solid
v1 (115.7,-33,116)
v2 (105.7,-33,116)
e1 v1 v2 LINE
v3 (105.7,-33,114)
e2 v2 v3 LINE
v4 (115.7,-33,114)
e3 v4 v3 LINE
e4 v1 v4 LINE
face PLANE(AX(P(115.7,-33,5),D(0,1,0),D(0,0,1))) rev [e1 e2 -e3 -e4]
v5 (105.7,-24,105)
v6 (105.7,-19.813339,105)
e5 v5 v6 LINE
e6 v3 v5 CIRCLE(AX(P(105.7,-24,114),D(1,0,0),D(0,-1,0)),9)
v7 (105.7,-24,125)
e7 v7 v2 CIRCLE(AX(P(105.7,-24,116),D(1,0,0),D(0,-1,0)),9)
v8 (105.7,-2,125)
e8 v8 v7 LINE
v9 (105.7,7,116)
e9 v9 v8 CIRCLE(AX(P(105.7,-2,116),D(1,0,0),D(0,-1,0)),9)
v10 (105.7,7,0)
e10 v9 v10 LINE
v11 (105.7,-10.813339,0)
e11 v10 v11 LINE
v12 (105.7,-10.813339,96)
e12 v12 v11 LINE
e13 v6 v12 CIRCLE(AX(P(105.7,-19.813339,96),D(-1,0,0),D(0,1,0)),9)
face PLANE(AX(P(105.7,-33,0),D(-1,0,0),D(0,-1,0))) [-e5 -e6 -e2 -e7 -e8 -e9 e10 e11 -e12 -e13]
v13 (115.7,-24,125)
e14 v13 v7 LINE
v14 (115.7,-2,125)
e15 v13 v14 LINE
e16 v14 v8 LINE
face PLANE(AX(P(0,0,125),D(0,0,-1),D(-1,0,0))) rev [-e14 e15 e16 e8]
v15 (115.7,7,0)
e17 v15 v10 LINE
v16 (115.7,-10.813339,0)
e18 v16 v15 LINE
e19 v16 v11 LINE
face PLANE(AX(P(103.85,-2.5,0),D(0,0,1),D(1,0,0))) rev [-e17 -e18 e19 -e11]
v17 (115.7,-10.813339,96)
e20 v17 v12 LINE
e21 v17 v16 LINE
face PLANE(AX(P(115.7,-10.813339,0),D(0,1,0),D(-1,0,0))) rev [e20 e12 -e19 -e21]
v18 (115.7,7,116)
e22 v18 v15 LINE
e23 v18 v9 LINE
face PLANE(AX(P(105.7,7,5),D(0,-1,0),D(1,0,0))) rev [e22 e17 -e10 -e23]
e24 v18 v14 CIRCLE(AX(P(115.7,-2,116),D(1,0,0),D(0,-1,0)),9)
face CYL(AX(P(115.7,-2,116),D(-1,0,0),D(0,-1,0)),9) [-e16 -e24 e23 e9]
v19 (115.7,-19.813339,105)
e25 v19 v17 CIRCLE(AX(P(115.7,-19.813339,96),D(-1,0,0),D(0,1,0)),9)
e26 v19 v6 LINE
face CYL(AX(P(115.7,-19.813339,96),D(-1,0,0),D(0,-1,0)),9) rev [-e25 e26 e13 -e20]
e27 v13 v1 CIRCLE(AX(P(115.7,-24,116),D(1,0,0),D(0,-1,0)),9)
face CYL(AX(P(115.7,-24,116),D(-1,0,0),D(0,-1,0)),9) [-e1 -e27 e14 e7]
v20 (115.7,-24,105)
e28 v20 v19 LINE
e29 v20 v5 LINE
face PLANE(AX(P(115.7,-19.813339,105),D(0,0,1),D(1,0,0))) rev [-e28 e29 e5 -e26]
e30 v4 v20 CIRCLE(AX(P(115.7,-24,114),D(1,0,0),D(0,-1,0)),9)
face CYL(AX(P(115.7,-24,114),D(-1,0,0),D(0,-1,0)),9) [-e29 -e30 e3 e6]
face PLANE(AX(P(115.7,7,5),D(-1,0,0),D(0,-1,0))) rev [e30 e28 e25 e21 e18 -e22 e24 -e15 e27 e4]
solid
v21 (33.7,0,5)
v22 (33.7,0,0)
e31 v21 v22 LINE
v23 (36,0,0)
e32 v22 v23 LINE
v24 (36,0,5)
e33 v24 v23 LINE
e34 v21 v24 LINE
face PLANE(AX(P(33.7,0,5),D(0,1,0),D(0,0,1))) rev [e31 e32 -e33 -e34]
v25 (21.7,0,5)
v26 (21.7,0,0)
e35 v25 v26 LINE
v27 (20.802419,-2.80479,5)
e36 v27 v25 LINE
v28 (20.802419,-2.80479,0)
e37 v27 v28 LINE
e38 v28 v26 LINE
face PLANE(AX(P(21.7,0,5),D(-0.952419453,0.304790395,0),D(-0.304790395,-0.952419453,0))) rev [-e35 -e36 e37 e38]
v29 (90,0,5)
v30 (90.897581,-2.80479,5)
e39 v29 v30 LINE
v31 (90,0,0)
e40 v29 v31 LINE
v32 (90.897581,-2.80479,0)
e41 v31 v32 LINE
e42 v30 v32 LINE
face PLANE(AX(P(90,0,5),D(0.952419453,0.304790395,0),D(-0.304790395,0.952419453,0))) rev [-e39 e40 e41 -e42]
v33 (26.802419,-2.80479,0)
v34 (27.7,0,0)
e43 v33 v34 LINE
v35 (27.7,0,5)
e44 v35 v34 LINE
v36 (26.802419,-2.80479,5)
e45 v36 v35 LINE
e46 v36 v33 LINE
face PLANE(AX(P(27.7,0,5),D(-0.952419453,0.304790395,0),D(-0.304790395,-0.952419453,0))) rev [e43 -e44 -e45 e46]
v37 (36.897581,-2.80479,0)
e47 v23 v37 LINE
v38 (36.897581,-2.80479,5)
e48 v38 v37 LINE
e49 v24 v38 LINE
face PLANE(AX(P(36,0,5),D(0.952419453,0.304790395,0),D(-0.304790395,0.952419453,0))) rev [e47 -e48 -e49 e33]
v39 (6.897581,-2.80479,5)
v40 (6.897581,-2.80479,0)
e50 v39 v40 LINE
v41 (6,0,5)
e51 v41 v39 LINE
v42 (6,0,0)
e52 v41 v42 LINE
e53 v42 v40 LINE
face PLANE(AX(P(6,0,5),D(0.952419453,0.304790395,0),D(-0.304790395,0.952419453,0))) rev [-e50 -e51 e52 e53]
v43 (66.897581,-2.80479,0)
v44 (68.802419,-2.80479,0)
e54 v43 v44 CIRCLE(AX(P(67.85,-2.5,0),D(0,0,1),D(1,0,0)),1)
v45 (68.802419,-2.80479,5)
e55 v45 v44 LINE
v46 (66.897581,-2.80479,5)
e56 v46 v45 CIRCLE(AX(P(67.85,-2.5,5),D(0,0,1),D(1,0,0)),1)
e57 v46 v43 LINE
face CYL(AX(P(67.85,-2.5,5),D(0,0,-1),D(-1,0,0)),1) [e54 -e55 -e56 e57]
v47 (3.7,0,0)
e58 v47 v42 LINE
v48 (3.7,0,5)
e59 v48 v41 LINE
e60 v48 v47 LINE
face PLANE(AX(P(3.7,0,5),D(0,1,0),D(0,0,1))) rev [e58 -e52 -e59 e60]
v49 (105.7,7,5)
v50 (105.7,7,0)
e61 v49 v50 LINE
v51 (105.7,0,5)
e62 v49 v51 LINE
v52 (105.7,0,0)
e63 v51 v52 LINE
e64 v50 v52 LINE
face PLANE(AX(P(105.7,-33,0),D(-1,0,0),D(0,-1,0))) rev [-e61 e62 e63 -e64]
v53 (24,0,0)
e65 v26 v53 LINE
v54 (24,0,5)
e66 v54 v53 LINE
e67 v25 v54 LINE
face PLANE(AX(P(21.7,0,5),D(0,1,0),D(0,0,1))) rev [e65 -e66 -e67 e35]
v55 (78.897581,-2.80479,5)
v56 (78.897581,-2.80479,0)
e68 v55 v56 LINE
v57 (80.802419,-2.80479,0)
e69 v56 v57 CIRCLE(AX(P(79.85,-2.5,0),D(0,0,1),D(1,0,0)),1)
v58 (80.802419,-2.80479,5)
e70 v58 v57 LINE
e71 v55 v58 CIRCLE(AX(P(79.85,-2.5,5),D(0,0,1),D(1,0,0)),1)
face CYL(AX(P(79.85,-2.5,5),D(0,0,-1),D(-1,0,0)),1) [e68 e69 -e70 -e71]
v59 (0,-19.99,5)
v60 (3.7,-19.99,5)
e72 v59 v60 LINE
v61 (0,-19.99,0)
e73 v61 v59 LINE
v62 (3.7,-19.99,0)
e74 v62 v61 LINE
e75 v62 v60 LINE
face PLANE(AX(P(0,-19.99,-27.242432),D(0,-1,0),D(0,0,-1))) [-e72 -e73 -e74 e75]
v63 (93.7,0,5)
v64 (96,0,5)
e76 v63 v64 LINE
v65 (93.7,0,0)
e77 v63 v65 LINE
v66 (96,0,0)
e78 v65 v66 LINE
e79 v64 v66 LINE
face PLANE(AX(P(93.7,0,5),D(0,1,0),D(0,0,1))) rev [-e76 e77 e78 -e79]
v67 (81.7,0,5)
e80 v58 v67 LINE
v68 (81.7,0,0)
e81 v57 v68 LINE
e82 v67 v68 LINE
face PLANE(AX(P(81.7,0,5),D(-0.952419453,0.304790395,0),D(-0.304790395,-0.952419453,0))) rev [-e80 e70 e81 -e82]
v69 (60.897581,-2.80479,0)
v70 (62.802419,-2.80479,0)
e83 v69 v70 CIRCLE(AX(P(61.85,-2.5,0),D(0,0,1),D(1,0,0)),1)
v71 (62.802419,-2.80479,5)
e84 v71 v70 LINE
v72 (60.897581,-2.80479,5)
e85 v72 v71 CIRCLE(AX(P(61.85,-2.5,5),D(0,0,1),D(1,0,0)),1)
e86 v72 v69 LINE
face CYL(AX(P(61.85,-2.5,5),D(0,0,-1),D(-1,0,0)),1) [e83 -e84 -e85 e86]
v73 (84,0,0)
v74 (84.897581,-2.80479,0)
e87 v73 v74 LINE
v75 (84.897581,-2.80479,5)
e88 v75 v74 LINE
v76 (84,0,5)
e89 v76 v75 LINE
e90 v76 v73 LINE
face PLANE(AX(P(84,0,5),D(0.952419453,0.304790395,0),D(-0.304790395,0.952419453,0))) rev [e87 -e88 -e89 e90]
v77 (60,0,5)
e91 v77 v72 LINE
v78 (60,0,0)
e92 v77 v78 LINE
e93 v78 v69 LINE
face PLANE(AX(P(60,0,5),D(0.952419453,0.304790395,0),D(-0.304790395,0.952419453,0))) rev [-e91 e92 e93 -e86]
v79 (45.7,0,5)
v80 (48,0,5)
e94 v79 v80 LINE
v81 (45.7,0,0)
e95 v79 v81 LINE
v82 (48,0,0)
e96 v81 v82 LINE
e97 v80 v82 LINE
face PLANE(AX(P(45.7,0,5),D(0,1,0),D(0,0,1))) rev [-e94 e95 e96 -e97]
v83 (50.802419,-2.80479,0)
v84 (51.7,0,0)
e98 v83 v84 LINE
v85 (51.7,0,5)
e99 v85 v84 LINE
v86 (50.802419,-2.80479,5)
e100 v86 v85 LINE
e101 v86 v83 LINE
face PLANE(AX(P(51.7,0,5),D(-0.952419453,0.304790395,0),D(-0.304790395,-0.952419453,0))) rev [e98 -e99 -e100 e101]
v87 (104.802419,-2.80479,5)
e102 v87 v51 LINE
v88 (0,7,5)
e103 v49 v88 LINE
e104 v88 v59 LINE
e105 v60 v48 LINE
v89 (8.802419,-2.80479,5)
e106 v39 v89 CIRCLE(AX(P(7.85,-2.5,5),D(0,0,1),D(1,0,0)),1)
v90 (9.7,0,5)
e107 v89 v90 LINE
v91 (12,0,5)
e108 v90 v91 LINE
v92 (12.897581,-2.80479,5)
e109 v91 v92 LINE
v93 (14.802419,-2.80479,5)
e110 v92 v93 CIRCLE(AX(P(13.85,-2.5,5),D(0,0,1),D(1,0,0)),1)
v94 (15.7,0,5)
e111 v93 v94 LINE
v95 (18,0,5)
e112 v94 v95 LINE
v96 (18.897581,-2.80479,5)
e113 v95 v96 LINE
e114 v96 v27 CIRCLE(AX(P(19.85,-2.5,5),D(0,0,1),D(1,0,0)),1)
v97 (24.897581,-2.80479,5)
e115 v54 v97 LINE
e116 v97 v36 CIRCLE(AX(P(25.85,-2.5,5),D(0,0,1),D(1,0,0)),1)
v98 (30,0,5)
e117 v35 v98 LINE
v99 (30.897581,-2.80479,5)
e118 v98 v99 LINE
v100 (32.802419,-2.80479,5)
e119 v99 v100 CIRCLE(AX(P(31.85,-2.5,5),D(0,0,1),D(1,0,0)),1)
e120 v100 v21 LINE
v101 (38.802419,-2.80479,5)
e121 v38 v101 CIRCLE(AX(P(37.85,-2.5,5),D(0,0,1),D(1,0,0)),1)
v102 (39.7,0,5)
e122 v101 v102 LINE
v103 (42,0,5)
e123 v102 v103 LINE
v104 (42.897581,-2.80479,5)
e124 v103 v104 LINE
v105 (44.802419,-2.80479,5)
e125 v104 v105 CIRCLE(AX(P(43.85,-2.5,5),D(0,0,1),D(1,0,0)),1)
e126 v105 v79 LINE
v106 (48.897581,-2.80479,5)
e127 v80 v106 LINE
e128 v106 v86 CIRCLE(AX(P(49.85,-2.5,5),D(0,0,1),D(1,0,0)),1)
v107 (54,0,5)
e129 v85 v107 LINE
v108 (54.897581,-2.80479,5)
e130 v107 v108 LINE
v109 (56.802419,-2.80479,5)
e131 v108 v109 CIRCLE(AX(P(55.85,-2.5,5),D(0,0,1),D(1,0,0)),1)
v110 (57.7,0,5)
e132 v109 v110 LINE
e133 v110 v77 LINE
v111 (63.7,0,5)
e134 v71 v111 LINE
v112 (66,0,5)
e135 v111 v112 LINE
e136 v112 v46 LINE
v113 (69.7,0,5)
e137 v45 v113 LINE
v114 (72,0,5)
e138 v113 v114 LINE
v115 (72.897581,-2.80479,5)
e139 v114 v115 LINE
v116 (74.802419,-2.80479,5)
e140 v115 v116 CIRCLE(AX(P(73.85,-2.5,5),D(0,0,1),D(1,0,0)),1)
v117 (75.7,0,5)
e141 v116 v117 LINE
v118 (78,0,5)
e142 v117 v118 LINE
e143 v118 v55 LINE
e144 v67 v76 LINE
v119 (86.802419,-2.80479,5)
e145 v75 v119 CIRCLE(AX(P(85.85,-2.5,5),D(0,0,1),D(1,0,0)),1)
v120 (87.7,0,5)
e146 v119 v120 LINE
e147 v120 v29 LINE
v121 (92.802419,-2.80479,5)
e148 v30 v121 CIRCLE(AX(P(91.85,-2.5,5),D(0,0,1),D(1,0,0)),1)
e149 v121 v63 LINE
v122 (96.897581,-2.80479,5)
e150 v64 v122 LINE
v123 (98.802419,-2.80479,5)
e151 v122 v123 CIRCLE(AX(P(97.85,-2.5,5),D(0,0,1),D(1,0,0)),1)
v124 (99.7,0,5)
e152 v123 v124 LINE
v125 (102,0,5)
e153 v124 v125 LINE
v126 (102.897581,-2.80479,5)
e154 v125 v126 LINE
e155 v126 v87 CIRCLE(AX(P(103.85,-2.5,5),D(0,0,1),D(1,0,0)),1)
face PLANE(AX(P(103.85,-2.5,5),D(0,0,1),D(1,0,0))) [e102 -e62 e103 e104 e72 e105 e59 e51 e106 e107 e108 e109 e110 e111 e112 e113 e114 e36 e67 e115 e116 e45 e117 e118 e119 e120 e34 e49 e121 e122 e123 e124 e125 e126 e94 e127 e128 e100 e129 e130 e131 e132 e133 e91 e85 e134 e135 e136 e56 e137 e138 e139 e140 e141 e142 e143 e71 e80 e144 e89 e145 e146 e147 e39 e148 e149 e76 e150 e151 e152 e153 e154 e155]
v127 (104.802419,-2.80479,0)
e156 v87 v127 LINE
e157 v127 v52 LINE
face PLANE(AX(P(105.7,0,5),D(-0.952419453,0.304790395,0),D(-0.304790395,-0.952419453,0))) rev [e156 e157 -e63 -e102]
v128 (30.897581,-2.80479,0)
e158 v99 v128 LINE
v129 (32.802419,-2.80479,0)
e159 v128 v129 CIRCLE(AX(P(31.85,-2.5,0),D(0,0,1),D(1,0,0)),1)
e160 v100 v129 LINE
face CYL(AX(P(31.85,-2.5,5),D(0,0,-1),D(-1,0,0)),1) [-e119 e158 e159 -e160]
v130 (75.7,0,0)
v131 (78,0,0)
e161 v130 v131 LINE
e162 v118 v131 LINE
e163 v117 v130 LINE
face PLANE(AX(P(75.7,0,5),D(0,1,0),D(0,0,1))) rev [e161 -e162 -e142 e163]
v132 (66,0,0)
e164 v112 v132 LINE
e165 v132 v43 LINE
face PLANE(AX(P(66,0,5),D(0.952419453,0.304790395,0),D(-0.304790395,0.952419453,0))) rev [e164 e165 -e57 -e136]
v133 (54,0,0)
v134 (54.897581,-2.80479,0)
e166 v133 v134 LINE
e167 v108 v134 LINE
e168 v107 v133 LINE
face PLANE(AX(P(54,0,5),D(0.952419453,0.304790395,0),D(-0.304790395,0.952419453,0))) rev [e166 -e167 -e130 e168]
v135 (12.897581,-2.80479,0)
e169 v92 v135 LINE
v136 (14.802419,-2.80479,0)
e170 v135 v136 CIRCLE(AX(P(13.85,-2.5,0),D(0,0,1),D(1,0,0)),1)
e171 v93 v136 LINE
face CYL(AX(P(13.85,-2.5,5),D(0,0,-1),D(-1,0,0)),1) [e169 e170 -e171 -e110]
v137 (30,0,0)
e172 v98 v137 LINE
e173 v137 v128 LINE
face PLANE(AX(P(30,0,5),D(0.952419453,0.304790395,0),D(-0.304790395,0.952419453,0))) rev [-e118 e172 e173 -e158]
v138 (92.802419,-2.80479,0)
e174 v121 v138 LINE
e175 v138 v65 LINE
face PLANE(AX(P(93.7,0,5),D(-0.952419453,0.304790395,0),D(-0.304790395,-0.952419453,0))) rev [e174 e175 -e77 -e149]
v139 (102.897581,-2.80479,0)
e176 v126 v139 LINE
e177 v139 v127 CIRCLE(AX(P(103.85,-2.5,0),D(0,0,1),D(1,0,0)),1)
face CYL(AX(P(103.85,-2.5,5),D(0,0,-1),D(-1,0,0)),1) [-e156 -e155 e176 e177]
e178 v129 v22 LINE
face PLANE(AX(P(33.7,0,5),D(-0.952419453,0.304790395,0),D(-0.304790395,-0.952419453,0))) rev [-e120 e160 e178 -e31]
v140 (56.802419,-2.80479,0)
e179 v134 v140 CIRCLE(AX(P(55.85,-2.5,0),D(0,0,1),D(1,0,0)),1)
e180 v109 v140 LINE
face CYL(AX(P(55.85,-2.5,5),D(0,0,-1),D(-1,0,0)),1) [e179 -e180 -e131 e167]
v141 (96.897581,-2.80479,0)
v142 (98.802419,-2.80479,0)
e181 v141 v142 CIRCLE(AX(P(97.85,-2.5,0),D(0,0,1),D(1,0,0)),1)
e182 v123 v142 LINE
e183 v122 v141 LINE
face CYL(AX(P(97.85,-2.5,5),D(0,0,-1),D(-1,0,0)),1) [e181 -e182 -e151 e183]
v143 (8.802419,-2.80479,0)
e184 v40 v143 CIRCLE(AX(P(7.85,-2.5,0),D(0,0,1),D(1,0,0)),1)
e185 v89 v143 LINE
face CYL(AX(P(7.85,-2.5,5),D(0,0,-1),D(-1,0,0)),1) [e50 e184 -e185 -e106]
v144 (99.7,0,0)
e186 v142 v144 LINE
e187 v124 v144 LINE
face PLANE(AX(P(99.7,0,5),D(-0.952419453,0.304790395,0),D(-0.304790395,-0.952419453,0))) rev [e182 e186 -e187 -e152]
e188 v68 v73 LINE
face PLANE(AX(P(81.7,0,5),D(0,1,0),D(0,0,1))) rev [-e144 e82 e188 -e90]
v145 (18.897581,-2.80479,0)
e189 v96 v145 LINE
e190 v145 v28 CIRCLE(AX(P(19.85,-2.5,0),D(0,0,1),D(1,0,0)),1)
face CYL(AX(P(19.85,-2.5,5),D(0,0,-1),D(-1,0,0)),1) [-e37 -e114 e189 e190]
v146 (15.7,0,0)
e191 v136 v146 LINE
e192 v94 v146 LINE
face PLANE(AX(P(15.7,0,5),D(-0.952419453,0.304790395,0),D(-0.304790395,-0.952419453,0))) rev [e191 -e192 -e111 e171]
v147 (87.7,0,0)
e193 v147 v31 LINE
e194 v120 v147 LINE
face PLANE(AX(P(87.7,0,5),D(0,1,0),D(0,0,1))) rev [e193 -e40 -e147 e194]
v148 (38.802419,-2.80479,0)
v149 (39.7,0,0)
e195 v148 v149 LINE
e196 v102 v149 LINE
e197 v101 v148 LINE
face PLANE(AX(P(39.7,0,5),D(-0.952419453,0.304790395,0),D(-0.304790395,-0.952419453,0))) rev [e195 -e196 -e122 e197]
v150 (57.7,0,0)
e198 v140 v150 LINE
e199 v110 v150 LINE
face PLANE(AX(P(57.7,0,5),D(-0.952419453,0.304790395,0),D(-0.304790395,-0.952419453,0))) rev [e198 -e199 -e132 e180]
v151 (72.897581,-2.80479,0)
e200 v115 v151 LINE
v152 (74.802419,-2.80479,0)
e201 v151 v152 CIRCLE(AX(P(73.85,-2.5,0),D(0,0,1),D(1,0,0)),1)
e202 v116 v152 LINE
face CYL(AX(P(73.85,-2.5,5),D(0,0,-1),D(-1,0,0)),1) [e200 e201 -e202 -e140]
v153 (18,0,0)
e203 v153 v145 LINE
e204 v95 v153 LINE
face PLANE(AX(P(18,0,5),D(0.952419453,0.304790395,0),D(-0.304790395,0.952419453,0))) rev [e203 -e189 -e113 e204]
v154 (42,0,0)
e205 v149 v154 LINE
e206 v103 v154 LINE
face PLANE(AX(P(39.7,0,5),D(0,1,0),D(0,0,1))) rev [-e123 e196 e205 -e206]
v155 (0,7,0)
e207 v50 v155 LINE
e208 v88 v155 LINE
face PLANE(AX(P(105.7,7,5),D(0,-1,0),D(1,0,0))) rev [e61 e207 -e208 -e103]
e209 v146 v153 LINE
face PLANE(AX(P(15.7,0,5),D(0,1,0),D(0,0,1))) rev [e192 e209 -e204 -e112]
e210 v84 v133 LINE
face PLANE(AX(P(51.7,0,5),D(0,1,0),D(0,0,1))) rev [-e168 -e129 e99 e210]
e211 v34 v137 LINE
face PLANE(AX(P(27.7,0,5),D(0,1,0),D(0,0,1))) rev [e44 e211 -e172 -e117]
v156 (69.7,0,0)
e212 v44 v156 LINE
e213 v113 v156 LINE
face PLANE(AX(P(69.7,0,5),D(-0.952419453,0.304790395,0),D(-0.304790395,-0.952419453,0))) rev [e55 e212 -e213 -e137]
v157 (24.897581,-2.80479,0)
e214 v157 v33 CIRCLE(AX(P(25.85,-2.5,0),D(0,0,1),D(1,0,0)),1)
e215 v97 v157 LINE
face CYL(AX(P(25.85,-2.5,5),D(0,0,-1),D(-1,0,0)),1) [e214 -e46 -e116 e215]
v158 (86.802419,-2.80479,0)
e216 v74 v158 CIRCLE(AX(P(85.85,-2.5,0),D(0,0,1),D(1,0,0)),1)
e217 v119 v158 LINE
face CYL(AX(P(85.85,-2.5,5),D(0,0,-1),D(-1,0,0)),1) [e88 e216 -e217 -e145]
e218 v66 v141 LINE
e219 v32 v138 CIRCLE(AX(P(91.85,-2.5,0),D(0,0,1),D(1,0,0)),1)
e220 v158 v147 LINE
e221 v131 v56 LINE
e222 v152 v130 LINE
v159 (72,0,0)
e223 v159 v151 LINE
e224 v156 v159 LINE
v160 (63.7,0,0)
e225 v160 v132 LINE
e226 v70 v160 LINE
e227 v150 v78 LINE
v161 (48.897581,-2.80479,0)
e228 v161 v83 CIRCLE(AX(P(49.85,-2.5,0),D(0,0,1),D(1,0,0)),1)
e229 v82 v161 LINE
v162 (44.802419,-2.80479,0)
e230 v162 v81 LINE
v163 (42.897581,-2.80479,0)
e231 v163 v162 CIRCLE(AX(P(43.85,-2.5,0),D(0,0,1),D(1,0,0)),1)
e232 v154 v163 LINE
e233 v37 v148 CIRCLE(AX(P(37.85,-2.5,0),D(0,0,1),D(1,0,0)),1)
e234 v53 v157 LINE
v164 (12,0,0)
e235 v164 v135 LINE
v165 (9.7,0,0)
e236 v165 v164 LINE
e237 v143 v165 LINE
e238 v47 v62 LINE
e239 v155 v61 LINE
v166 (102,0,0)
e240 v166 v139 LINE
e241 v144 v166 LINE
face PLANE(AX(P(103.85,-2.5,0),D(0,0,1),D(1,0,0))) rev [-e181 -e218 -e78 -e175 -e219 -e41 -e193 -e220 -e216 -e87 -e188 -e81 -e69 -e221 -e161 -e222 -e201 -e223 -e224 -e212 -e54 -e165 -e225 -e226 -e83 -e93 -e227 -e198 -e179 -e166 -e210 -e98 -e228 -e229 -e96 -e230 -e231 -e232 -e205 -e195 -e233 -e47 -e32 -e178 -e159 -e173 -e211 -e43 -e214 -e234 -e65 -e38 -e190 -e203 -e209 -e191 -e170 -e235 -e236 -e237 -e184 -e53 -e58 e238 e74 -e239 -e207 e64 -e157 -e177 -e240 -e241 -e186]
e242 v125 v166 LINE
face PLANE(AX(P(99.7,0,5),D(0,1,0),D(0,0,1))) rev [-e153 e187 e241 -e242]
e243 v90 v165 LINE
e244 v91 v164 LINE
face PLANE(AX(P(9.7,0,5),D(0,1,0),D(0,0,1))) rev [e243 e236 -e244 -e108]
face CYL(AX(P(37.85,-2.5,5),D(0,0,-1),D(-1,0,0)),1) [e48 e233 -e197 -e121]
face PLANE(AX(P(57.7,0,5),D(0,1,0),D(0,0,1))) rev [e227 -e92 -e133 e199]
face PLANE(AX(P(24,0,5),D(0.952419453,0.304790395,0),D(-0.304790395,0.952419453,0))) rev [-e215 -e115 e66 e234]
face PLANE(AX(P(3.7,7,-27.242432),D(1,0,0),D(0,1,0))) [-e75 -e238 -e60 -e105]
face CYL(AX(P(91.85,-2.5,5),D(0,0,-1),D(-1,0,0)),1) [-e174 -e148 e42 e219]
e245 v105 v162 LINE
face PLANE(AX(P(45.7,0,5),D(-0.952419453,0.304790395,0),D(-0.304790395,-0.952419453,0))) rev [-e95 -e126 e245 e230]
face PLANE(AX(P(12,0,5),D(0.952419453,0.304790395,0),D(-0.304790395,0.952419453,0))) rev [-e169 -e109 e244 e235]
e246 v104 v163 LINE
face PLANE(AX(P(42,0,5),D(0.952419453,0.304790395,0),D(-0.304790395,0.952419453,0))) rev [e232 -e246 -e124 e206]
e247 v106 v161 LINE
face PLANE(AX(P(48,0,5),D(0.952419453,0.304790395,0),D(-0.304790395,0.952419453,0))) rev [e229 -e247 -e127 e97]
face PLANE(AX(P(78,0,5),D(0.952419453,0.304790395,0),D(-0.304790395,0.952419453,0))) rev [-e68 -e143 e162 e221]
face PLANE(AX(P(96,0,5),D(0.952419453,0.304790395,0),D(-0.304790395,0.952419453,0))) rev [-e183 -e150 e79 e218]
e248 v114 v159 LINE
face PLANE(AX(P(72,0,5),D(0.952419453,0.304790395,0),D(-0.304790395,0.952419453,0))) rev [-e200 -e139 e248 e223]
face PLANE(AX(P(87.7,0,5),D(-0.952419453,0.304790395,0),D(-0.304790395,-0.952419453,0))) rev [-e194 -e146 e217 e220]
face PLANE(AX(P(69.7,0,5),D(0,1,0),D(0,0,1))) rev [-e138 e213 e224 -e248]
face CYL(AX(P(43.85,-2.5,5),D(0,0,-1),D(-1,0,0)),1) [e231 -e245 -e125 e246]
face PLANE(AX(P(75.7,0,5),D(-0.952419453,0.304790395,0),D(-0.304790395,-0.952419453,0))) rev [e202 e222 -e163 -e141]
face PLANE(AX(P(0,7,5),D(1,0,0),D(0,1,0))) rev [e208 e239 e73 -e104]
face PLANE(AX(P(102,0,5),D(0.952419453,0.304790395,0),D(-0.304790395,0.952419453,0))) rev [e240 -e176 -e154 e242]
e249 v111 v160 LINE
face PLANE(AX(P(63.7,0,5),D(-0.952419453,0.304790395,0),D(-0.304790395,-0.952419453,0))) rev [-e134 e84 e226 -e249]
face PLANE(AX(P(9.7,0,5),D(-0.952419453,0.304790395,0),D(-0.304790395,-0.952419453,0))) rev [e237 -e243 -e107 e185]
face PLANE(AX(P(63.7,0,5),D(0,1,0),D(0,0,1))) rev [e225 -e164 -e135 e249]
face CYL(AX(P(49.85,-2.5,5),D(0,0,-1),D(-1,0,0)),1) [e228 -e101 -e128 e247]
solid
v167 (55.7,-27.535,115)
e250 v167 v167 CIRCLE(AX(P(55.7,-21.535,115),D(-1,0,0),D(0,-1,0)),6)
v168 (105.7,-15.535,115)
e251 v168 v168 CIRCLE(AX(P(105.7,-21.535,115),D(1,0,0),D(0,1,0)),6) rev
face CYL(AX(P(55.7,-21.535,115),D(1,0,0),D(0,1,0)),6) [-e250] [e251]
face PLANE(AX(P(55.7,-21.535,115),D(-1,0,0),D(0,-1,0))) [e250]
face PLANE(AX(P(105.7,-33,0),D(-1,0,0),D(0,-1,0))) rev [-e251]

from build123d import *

# Parameters (mm, degrees)
DODANIE_WYCI_GNI_CIE1_DEPTH = 5
SZKIC3_W                    = 10
SZKIC3_H                    = 40
DODANIE_WYCI_GNI_CIE2_DEPTH = 120
SZKIC4_R                    = 6
DODANIE_WYCI_GNI_CIE3_DEPTH = 50
PODZIEL1_START              = 105.7
PODZIEL1_OUTLINE_W          = 40
PODZIEL1_OUTLINE_H          = 125
PODZIEL1_DEPTH              = 10
PODZIEL1_START_2            = 55.7
PODZIEL1_2_OUTLINE_R        = 6
PODZIEL1_2_DEPTH            = 50
PODZIEL1_3_OUTLINE_W        = 40
PODZIEL1_3_OUTLINE_H        = 125
PODZIEL1_3_DEPTH            = 10
PODZIEL1_4_OUTLINE_R        = 6
PODZIEL1_4_DEPTH            = 50
WYTNIJ_WYCI_GNI_CIE1_DEPTH  = 167.992484861
SZKIC7_W                    = 3.7
SZKIC7_H                    = 26.99
DODANIE_WYCI_GNI_CIE4_DEPTH = 5


# Read off the part's stored shape, not the designer's step: Podziel1
with BuildPart() as part:
    # Szkic2 → Dodanie-wyciągnięcie1 (new body)
    with BuildSketch(Plane.XY):
        with BuildLine():
            Line((9.7, 0), (12, 0))
            Line((12, 0), (12.897580547, -2.804790395))
            ThreePointArc((12.897580547, -2.804790395), (13.85, -3.5), (14.802419453, -2.804790395))
            Line((14.802419453, -2.804790395), (15.7, 0))
            Line((15.7, 0), (18, 0))
            Line((18, 0), (18.897580547, -2.804790395))
            ThreePointArc((18.897580547, -2.804790395), (19.85, -3.5), (20.802419453, -2.804790395))
            Line((20.802419453, -2.804790395), (21.7, 0))
            Line((21.7, 0), (24, 0))
            Line((24, 0), (24.897580547, -2.804790395))
            ThreePointArc((24.897580547, -2.804790395), (25.85, -3.5), (26.802419453, -2.804790395))
            Line((26.802419453, -2.804790395), (27.7, 0))
            Line((27.7, 0), (30, 0))
            Line((30, 0), (30.897580547, -2.804790395))
            ThreePointArc((30.897580547, -2.804790395), (31.85, -3.5), (32.802419453, -2.804790395))
            Line((32.802419453, -2.804790395), (33.7, 0))
            Line((33.7, 0), (36, 0))
            Line((36, 0), (36.897580547, -2.804790395))
            ThreePointArc((36.897580547, -2.804790395), (37.85, -3.5), (38.802419453, -2.804790395))
            Line((38.802419453, -2.804790395), (39.7, 0))
            Line((39.7, 0), (42, 0))
            Line((42, 0), (42.897580547, -2.804790395))
            ThreePointArc((42.897580547, -2.804790395), (43.85, -3.5), (44.802419453, -2.804790395))
            Line((44.802419453, -2.804790395), (45.7, 0))
            Line((45.7, 0), (48, 0))
            Line((48, 0), (48.897580547, -2.804790395))
            ThreePointArc((48.897580547, -2.804790395), (49.85, -3.5), (50.802419453, -2.804790395))
            Line((50.802419453, -2.804790395), (51.7, 0))
            Line((51.7, 0), (54, 0))
            Line((54, 0), (54.897580547, -2.804790395))
            ThreePointArc((54.897580547, -2.804790395), (55.85, -3.5), (56.802419453, -2.804790395))
            Line((56.802419453, -2.804790395), (57.7, 0))
            Line((57.7, 0), (60, 0))
            Line((60, 0), (60.897580547, -2.804790395))
            ThreePointArc((60.897580547, -2.804790395), (61.85, -3.5), (62.802419453, -2.804790395))
            Line((62.802419453, -2.804790395), (63.7, 0))
            Line((63.7, 0), (66, 0))
            Line((66, 0), (66.897580547, -2.804790395))
            ThreePointArc((66.897580547, -2.804790395), (67.85, -3.5), (68.802419453, -2.804790395))
            Line((68.802419453, -2.804790395), (69.7, 0))
            Line((69.7, 0), (72, 0))
            Line((72, 0), (72.897580547, -2.804790395))
            ThreePointArc((72.897580547, -2.804790395), (73.85, -3.5), (74.802419453, -2.804790395))
            Line((74.802419453, -2.804790395), (75.7, 0))
            Line((75.7, 0), (78, 0))
            Line((78, 0), (78.897580547, -2.804790395))
            ThreePointArc((78.897580547, -2.804790395), (79.85, -3.5), (80.802419453, -2.804790395))
            Line((80.802419453, -2.804790395), (81.7, 0))
            Line((81.7, 0), (84, 0))
            Line((84, 0), (84.897580547, -2.804790395))
            ThreePointArc((84.897580547, -2.804790395), (85.85, -3.5), (86.802419453, -2.804790395))
            Line((86.802419453, -2.804790395), (87.7, 0))
            Line((87.7, 0), (90, 0))
            Line((90, 0), (90.897580547, -2.804790395))
            ThreePointArc((90.897580547, -2.804790395), (91.85, -3.5), (92.802419453, -2.804790395))
            Line((92.802419453, -2.804790395), (93.7, 0))
            Line((93.7, 0), (96, 0))
            Line((96, 0), (96.897580547, -2.804790395))
            ThreePointArc((96.897580547, -2.804790395), (97.85, -3.5), (98.802419453, -2.804790395))
            Line((98.802419453, -2.804790395), (99.7, 0))
            Line((99.7, 0), (102, 0))
            Line((102, 0), (102.897580547, -2.804790395))
            ThreePointArc((102.897580547, -2.804790395), (103.85, -3.5), (104.802419453, -2.804790395))
            Line((104.802419453, -2.804790395), (105.7, 0))
            Line((105.7, 0), (105.7, -33))
            Line((105.7, -33), (115.7, -33))
            Line((115.7, -33), (115.7, 7))
            Line((115.7, 7), (105.7, 7))
            Line((105.7, 7), (0, 7))
            Line((0, 7), (0, 0))
            Line((0, 0), (0.897580547, -2.804790395))
            ThreePointArc((0.897580547, -2.804790395), (1.85, -3.5), (2.802419453, -2.804790395))
            Line((2.802419453, -2.804790395), (3.7, 0))
            Line((3.7, 0), (6, 0))
            Line((6, 0), (6.897580547, -2.804790395))
            ThreePointArc((6.897580547, -2.804790395), (7.85, -3.5), (8.802419453, -2.804790395))
            Line((8.802419453, -2.804790395), (9.7, 0))
        make_face()
    extrude(amount=DODANIE_WYCI_GNI_CIE1_DEPTH)

    # Szkic3 → Dodanie-wyciągnięcie2 (add)
    with BuildSketch(Plane.XY.offset(5)):
        with Locations((110.7, -13)):
            Rectangle(SZKIC3_W, SZKIC3_H)
    extrude(amount=DODANIE_WYCI_GNI_CIE2_DEPTH)

    # Szkic4 → Dodanie-wyciągnięcie3 (add)
    with BuildSketch(Plane.ZY.offset(-105.7)):
        with Locations(Location((115, -21.535, 0), (0, 0, 90))):
            Circle(SZKIC4_R)
    extrude(amount=DODANIE_WYCI_GNI_CIE3_DEPTH)

    # Podziel1 outline → Podziel1 (cut)
    with BuildSketch(Plane.YZ.offset(PODZIEL1_START)):
        with Locations((-13, 62.5)):
            Rectangle(PODZIEL1_OUTLINE_W, PODZIEL1_OUTLINE_H)
    extrude(amount=PODZIEL1_DEPTH, mode=Mode.SUBTRACT)

    # Podziel1 2 outline → Podziel1 2 (cut)
    with BuildSketch(Plane.YZ.offset(PODZIEL1_START_2)):
        with Locations((-21.535, 115)):
            Circle(PODZIEL1_2_OUTLINE_R)
    extrude(amount=PODZIEL1_2_DEPTH, mode=Mode.SUBTRACT)

    # Szkic7 → Dodanie-wyciągnięcie4 (add)
    with BuildSketch(Plane.XY.offset(5)):
        with Locations((1.85, -6.495)):
            Rectangle(SZKIC7_W, SZKIC7_H)
    extrude(amount=-DODANIE_WYCI_GNI_CIE4_DEPTH)


with BuildPart() as body_2:
    # Podziel1 3 outline → Podziel1 3 (new body)
    with BuildSketch(Plane.YZ.offset(PODZIEL1_START)):
        with Locations((-13, 62.5)):
            Rectangle(PODZIEL1_3_OUTLINE_W, PODZIEL1_3_OUTLINE_H)
    extrude(amount=PODZIEL1_3_DEPTH)

    # Szkic6 → Wytnij-wyciągnięcie1 (cut, through all)
    with BuildSketch(Plane.ZY.offset(-105.7)):
        with BuildLine():
            Line((0, -10.813339386), (96, -10.813339386))
            ThreePointArc((96, -10.813339386), (102.363961031, -13.449378356), (105, -19.813339386))
            Line((105, -19.813339386), (105, -24))
            ThreePointArc((105, -24), (107.636038969, -30.363961031), (114, -33))
            Line((114, -33), (116, -33))
            ThreePointArc((116, -33), (122.363961031, -30.363961031), (125, -24))
            Line((125, -24), (125, -2))
            ThreePointArc((125, -2), (122.363961031, 4.363961031), (116, 7))
            Line((116, 7), (106.876347747, 7))
            Line((106.876347747, 7), (106.876347747, 17.227367306))
            Line((106.876347747, 17.227367306), (133.63078349, 17.227367306))
            Line((133.63078349, 17.227367306), (133.63078349, -45.542655015))
            Line((133.63078349, -45.542655015), (0, -45.542655015))
            Line((0, -45.542655015), (0, -10.813339386))
        make_face()
    extrude(amount=-WYTNIJ_WYCI_GNI_CIE1_DEPTH, mode=Mode.SUBTRACT)


with BuildPart() as body_3:
    # Podziel1 4 outline → Podziel1 4 (new body)
    with BuildSketch(Plane.YZ.offset(PODZIEL1_START_2)):
        with Locations((-21.535, 115)):
            Circle(PODZIEL1_4_OUTLINE_R)
    extrude(amount=PODZIEL1_4_DEPTH)


solid = Compound([part.part, body_2.part, body_3.part])
